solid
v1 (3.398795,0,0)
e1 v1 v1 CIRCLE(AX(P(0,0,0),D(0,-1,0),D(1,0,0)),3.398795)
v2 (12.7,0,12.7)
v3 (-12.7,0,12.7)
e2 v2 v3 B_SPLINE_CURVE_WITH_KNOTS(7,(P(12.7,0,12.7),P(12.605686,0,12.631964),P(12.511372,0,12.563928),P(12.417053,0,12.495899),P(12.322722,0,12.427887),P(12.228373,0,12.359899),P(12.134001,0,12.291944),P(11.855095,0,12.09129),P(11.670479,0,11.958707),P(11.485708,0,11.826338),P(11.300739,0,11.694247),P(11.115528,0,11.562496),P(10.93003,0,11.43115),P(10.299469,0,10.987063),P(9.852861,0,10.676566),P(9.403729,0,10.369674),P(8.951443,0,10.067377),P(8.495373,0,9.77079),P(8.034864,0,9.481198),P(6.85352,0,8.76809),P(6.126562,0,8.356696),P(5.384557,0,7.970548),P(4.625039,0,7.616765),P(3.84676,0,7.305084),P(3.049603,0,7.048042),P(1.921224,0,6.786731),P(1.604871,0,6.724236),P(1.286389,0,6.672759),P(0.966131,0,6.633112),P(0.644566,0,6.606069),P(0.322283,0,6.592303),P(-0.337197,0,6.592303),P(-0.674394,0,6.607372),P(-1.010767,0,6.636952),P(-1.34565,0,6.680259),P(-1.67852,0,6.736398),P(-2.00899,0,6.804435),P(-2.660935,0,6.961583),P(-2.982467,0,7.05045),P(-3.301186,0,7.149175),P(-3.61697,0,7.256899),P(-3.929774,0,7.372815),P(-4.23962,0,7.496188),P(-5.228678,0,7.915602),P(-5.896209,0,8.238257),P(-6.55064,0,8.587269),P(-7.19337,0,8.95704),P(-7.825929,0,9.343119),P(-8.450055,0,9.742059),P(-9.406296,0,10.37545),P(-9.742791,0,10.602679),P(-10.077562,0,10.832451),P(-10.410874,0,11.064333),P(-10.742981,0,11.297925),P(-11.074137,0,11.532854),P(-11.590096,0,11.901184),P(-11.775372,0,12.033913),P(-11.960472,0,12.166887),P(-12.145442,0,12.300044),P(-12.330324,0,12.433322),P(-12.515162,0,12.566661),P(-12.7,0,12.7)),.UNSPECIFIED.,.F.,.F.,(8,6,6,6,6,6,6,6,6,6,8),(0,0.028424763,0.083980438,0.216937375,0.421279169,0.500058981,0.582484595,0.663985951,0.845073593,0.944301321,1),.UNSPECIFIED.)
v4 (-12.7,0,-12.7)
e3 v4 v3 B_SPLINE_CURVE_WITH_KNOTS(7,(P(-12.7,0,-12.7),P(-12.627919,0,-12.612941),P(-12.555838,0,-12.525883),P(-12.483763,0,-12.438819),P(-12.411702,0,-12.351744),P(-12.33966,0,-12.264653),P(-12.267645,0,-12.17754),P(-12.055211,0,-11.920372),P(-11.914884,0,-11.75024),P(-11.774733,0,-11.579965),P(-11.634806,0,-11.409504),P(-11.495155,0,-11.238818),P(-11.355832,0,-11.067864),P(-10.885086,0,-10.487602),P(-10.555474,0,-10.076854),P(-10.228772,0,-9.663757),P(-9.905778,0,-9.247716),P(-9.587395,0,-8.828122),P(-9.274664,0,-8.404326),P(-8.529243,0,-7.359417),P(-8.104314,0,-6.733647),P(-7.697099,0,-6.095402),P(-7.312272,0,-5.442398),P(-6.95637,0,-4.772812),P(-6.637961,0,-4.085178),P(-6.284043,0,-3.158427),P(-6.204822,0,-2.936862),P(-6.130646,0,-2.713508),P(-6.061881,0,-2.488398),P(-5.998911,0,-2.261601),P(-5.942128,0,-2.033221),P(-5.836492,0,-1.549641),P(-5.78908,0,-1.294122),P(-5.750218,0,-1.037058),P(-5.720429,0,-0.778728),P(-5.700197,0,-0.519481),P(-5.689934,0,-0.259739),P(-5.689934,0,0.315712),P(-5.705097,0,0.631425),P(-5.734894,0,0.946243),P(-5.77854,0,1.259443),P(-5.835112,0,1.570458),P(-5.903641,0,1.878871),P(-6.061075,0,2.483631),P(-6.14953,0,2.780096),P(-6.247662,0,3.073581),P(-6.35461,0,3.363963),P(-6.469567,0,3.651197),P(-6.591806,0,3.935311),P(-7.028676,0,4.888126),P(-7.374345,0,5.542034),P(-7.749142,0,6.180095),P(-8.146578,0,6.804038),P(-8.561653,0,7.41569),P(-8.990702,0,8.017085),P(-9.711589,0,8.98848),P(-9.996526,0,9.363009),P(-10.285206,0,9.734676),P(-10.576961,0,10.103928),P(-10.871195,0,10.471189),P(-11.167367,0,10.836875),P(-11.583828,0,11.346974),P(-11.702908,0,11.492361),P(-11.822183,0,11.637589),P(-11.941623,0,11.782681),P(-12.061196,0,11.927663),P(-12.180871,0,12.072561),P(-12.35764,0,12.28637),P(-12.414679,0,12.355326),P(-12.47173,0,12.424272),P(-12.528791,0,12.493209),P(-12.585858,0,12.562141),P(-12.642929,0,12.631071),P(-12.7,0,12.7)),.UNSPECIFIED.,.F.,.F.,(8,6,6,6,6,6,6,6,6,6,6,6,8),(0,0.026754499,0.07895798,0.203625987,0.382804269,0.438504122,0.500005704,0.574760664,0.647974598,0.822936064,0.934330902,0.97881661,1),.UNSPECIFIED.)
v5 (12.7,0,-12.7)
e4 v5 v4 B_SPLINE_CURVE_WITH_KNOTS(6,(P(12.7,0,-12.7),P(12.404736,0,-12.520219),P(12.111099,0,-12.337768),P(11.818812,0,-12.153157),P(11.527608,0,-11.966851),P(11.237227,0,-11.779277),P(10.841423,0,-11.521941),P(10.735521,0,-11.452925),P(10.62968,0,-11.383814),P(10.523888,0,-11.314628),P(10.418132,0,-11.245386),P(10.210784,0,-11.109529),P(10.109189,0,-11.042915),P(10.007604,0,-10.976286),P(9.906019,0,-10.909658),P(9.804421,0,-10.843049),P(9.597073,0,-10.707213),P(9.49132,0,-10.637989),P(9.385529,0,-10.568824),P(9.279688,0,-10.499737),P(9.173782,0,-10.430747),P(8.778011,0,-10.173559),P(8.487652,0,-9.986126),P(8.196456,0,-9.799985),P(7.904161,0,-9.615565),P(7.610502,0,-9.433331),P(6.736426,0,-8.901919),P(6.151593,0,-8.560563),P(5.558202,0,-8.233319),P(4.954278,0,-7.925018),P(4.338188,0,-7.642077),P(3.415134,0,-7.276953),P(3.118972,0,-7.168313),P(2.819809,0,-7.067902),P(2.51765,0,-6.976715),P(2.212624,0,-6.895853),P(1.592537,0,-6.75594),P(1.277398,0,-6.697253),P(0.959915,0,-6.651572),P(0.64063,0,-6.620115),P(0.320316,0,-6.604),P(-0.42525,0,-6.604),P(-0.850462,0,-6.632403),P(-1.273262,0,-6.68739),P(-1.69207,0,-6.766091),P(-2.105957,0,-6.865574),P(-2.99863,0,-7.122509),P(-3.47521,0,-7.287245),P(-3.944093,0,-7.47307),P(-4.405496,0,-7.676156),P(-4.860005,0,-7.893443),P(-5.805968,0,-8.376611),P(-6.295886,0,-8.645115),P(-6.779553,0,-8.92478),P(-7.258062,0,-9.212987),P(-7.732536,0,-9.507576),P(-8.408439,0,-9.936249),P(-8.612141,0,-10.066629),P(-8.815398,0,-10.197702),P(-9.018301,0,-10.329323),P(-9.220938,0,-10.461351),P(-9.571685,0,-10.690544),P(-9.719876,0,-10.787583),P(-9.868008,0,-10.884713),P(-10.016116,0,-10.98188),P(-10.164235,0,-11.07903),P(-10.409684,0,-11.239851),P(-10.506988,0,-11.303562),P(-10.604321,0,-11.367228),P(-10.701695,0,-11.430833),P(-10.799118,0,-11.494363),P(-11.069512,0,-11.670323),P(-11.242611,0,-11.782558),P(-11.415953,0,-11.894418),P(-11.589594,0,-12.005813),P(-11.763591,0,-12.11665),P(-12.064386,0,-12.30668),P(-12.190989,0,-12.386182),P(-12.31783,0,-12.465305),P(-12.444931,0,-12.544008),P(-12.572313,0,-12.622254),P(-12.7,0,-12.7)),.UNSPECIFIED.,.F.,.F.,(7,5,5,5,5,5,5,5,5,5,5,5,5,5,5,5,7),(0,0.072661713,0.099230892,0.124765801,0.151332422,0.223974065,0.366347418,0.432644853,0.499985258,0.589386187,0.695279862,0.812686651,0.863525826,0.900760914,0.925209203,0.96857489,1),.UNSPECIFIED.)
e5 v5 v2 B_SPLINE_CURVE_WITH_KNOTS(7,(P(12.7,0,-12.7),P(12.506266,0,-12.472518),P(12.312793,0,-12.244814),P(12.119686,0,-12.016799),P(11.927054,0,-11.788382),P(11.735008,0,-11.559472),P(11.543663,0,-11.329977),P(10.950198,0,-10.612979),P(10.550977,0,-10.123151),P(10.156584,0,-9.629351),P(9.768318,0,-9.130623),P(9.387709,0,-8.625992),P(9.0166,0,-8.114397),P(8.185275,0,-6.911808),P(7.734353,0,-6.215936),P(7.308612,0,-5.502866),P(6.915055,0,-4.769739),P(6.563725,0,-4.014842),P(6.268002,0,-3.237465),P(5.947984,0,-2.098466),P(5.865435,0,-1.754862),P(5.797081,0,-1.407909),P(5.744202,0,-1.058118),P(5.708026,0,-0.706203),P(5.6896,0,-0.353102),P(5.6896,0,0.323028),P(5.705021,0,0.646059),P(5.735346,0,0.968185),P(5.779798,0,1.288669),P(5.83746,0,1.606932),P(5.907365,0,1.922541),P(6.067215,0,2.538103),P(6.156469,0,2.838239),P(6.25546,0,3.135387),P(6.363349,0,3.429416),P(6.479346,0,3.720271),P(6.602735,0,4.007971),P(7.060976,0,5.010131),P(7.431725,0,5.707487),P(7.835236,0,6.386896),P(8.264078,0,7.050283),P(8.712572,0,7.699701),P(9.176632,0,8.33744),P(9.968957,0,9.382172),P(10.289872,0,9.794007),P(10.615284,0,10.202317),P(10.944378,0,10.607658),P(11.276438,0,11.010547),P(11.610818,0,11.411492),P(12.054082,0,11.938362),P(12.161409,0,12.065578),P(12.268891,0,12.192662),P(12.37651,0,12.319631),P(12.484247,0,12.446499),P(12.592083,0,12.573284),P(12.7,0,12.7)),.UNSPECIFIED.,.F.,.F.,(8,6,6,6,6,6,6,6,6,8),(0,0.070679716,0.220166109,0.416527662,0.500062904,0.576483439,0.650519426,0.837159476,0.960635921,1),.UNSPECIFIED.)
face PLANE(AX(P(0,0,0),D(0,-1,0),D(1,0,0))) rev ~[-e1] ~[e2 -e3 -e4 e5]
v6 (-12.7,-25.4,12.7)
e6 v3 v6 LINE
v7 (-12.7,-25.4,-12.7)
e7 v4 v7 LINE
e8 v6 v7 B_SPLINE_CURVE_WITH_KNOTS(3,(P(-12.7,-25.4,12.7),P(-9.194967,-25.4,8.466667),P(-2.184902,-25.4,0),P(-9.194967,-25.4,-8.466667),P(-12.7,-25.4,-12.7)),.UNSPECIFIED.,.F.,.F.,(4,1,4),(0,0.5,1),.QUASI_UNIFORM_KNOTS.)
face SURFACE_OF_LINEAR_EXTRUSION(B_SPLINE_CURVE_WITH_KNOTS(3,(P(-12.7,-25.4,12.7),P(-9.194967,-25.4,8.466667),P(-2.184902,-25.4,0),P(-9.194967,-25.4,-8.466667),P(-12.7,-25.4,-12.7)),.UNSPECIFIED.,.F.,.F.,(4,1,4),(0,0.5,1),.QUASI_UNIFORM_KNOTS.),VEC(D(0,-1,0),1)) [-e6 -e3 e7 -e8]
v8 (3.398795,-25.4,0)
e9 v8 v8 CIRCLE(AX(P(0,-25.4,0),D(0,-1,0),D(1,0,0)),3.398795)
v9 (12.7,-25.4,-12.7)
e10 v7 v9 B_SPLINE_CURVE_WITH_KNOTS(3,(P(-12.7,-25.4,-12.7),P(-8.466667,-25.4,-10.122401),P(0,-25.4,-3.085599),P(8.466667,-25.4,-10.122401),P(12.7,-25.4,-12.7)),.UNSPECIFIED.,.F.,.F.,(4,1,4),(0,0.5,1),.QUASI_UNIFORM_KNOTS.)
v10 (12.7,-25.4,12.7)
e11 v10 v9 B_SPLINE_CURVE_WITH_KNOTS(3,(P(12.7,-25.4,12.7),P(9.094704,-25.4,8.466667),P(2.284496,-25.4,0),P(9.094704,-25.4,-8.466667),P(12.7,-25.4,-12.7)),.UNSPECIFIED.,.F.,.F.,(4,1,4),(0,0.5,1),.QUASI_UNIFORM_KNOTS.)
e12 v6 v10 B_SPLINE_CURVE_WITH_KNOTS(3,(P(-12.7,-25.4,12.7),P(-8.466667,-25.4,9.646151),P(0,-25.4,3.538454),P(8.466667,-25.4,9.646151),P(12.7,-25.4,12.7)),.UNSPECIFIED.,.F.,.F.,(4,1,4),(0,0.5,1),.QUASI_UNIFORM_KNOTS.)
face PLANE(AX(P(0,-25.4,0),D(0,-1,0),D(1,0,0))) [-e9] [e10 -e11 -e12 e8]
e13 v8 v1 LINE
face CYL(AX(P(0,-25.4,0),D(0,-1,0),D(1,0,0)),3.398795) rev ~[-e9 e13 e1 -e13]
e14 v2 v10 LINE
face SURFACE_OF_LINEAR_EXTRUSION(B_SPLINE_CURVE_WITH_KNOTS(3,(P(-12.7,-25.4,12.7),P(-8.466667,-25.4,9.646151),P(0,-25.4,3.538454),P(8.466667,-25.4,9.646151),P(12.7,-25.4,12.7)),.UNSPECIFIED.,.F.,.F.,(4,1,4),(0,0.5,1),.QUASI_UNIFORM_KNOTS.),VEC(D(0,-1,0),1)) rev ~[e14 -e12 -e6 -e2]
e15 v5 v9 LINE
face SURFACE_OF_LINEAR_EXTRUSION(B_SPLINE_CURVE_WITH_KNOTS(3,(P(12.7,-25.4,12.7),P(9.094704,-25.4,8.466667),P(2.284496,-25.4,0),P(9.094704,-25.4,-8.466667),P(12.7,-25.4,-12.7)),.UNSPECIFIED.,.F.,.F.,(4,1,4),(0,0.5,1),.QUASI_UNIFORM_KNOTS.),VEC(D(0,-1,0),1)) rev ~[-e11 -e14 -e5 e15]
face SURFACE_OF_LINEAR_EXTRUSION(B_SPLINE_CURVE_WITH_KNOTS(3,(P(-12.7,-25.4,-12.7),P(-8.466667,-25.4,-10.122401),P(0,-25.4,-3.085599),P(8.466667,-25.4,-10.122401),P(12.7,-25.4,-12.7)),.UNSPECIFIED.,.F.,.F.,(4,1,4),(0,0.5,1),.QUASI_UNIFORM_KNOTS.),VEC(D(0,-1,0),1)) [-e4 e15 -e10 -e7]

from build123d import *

# Parameters (mm, degrees)
F0_W     = 25.4
F0_H     = 25.4
F1_DEPTH = 25.4
F3_DEPTH = 25.401
F4_DEPTH = 25.4010001
F5_DEPTH = 25.4010001
F6_DEPTH = 25.4010001
F7_R     = 3.3987951376
F8_DEPTH = 25.4010001


with BuildPart() as f1:
    # F0 (on Front) → F1 (new body)
    with BuildSketch(Plane.XZ):
        Rectangle(F0_W, F0_H)
    extrude(amount=F1_DEPTH)

    # F2 (on face) → F3 (cut, through all)
    with BuildSketch(Plane.XZ.offset(25.4)):
        with BuildLine():
            add(Edge.make_bspline(
                [(-12.7, 12.7), (-9.1949671809, 8.4666666667), (-2.1849015426, 0), (-9.1949671809, -8.4666666667), (-12.7, -12.7)],
                knots=[0, 0, 0, 0, 0.5, 1, 1, 1, 1], degree=3))
            Line((-12.7, 12.7), (-12.7, -12.7))
        make_face()
    extrude(amount=-F3_DEPTH, mode=Mode.SUBTRACT)

    # F2 (on face) → F4 (cut, through all)
    with BuildSketch(Plane.XZ.offset(25.4)):
        with BuildLine():
            Line((12.7, 12.7), (-12.7, 12.7))
            add(Edge.make_bspline(
                [(-12.7, 12.7), (-8.4666666667, 9.6461512916), (0, 3.5384538747), (8.4666666667, 9.6461512916), (12.7, 12.7)],
                knots=[0, 0, 0, 0, 0.5, 1, 1, 1, 1], degree=3))
        make_face()
    extrude(amount=-F4_DEPTH, mode=Mode.SUBTRACT)

    # F2 (on face) → F5 (cut, through all)
    with BuildSketch(Plane.XZ.offset(25.4)):
        with BuildLine():
            Line((12.7, -12.7), (12.7, 12.7))
            add(Edge.make_bspline(
                [(12.7, 12.7), (9.0947037864, 8.4666666667), (2.2844962136, 0), (9.0947037864, -8.4666666667), (12.7, -12.7)],
                knots=[0, 0, 0, 0, 0.5, 1, 1, 1, 1], degree=3))
        make_face()
    extrude(amount=-F5_DEPTH, mode=Mode.SUBTRACT)

    # F2 (on face) → F6 (cut, through all)
    with BuildSketch(Plane.XZ.offset(25.4)):
        with BuildLine():
            add(Edge.make_bspline(
                [(-12.7, -12.7), (-8.4666666667, -10.1224012509), (0, -3.0855987491), (8.4666666667, -10.1224012509), (12.7, -12.7)],
                knots=[0, 0, 0, 0, 0.5, 1, 1, 1, 1], degree=3))
            Line((-12.7, -12.7), (12.7, -12.7))
        make_face()
    extrude(amount=-F6_DEPTH, mode=Mode.SUBTRACT)

    # F7 (on face) → F8 (cut, through all)
    with BuildSketch(Plane.XZ.offset(25.4)):
        Circle(F7_R)
    extrude(amount=-F8_DEPTH, mode=Mode.SUBTRACT)


solid = f1.part
